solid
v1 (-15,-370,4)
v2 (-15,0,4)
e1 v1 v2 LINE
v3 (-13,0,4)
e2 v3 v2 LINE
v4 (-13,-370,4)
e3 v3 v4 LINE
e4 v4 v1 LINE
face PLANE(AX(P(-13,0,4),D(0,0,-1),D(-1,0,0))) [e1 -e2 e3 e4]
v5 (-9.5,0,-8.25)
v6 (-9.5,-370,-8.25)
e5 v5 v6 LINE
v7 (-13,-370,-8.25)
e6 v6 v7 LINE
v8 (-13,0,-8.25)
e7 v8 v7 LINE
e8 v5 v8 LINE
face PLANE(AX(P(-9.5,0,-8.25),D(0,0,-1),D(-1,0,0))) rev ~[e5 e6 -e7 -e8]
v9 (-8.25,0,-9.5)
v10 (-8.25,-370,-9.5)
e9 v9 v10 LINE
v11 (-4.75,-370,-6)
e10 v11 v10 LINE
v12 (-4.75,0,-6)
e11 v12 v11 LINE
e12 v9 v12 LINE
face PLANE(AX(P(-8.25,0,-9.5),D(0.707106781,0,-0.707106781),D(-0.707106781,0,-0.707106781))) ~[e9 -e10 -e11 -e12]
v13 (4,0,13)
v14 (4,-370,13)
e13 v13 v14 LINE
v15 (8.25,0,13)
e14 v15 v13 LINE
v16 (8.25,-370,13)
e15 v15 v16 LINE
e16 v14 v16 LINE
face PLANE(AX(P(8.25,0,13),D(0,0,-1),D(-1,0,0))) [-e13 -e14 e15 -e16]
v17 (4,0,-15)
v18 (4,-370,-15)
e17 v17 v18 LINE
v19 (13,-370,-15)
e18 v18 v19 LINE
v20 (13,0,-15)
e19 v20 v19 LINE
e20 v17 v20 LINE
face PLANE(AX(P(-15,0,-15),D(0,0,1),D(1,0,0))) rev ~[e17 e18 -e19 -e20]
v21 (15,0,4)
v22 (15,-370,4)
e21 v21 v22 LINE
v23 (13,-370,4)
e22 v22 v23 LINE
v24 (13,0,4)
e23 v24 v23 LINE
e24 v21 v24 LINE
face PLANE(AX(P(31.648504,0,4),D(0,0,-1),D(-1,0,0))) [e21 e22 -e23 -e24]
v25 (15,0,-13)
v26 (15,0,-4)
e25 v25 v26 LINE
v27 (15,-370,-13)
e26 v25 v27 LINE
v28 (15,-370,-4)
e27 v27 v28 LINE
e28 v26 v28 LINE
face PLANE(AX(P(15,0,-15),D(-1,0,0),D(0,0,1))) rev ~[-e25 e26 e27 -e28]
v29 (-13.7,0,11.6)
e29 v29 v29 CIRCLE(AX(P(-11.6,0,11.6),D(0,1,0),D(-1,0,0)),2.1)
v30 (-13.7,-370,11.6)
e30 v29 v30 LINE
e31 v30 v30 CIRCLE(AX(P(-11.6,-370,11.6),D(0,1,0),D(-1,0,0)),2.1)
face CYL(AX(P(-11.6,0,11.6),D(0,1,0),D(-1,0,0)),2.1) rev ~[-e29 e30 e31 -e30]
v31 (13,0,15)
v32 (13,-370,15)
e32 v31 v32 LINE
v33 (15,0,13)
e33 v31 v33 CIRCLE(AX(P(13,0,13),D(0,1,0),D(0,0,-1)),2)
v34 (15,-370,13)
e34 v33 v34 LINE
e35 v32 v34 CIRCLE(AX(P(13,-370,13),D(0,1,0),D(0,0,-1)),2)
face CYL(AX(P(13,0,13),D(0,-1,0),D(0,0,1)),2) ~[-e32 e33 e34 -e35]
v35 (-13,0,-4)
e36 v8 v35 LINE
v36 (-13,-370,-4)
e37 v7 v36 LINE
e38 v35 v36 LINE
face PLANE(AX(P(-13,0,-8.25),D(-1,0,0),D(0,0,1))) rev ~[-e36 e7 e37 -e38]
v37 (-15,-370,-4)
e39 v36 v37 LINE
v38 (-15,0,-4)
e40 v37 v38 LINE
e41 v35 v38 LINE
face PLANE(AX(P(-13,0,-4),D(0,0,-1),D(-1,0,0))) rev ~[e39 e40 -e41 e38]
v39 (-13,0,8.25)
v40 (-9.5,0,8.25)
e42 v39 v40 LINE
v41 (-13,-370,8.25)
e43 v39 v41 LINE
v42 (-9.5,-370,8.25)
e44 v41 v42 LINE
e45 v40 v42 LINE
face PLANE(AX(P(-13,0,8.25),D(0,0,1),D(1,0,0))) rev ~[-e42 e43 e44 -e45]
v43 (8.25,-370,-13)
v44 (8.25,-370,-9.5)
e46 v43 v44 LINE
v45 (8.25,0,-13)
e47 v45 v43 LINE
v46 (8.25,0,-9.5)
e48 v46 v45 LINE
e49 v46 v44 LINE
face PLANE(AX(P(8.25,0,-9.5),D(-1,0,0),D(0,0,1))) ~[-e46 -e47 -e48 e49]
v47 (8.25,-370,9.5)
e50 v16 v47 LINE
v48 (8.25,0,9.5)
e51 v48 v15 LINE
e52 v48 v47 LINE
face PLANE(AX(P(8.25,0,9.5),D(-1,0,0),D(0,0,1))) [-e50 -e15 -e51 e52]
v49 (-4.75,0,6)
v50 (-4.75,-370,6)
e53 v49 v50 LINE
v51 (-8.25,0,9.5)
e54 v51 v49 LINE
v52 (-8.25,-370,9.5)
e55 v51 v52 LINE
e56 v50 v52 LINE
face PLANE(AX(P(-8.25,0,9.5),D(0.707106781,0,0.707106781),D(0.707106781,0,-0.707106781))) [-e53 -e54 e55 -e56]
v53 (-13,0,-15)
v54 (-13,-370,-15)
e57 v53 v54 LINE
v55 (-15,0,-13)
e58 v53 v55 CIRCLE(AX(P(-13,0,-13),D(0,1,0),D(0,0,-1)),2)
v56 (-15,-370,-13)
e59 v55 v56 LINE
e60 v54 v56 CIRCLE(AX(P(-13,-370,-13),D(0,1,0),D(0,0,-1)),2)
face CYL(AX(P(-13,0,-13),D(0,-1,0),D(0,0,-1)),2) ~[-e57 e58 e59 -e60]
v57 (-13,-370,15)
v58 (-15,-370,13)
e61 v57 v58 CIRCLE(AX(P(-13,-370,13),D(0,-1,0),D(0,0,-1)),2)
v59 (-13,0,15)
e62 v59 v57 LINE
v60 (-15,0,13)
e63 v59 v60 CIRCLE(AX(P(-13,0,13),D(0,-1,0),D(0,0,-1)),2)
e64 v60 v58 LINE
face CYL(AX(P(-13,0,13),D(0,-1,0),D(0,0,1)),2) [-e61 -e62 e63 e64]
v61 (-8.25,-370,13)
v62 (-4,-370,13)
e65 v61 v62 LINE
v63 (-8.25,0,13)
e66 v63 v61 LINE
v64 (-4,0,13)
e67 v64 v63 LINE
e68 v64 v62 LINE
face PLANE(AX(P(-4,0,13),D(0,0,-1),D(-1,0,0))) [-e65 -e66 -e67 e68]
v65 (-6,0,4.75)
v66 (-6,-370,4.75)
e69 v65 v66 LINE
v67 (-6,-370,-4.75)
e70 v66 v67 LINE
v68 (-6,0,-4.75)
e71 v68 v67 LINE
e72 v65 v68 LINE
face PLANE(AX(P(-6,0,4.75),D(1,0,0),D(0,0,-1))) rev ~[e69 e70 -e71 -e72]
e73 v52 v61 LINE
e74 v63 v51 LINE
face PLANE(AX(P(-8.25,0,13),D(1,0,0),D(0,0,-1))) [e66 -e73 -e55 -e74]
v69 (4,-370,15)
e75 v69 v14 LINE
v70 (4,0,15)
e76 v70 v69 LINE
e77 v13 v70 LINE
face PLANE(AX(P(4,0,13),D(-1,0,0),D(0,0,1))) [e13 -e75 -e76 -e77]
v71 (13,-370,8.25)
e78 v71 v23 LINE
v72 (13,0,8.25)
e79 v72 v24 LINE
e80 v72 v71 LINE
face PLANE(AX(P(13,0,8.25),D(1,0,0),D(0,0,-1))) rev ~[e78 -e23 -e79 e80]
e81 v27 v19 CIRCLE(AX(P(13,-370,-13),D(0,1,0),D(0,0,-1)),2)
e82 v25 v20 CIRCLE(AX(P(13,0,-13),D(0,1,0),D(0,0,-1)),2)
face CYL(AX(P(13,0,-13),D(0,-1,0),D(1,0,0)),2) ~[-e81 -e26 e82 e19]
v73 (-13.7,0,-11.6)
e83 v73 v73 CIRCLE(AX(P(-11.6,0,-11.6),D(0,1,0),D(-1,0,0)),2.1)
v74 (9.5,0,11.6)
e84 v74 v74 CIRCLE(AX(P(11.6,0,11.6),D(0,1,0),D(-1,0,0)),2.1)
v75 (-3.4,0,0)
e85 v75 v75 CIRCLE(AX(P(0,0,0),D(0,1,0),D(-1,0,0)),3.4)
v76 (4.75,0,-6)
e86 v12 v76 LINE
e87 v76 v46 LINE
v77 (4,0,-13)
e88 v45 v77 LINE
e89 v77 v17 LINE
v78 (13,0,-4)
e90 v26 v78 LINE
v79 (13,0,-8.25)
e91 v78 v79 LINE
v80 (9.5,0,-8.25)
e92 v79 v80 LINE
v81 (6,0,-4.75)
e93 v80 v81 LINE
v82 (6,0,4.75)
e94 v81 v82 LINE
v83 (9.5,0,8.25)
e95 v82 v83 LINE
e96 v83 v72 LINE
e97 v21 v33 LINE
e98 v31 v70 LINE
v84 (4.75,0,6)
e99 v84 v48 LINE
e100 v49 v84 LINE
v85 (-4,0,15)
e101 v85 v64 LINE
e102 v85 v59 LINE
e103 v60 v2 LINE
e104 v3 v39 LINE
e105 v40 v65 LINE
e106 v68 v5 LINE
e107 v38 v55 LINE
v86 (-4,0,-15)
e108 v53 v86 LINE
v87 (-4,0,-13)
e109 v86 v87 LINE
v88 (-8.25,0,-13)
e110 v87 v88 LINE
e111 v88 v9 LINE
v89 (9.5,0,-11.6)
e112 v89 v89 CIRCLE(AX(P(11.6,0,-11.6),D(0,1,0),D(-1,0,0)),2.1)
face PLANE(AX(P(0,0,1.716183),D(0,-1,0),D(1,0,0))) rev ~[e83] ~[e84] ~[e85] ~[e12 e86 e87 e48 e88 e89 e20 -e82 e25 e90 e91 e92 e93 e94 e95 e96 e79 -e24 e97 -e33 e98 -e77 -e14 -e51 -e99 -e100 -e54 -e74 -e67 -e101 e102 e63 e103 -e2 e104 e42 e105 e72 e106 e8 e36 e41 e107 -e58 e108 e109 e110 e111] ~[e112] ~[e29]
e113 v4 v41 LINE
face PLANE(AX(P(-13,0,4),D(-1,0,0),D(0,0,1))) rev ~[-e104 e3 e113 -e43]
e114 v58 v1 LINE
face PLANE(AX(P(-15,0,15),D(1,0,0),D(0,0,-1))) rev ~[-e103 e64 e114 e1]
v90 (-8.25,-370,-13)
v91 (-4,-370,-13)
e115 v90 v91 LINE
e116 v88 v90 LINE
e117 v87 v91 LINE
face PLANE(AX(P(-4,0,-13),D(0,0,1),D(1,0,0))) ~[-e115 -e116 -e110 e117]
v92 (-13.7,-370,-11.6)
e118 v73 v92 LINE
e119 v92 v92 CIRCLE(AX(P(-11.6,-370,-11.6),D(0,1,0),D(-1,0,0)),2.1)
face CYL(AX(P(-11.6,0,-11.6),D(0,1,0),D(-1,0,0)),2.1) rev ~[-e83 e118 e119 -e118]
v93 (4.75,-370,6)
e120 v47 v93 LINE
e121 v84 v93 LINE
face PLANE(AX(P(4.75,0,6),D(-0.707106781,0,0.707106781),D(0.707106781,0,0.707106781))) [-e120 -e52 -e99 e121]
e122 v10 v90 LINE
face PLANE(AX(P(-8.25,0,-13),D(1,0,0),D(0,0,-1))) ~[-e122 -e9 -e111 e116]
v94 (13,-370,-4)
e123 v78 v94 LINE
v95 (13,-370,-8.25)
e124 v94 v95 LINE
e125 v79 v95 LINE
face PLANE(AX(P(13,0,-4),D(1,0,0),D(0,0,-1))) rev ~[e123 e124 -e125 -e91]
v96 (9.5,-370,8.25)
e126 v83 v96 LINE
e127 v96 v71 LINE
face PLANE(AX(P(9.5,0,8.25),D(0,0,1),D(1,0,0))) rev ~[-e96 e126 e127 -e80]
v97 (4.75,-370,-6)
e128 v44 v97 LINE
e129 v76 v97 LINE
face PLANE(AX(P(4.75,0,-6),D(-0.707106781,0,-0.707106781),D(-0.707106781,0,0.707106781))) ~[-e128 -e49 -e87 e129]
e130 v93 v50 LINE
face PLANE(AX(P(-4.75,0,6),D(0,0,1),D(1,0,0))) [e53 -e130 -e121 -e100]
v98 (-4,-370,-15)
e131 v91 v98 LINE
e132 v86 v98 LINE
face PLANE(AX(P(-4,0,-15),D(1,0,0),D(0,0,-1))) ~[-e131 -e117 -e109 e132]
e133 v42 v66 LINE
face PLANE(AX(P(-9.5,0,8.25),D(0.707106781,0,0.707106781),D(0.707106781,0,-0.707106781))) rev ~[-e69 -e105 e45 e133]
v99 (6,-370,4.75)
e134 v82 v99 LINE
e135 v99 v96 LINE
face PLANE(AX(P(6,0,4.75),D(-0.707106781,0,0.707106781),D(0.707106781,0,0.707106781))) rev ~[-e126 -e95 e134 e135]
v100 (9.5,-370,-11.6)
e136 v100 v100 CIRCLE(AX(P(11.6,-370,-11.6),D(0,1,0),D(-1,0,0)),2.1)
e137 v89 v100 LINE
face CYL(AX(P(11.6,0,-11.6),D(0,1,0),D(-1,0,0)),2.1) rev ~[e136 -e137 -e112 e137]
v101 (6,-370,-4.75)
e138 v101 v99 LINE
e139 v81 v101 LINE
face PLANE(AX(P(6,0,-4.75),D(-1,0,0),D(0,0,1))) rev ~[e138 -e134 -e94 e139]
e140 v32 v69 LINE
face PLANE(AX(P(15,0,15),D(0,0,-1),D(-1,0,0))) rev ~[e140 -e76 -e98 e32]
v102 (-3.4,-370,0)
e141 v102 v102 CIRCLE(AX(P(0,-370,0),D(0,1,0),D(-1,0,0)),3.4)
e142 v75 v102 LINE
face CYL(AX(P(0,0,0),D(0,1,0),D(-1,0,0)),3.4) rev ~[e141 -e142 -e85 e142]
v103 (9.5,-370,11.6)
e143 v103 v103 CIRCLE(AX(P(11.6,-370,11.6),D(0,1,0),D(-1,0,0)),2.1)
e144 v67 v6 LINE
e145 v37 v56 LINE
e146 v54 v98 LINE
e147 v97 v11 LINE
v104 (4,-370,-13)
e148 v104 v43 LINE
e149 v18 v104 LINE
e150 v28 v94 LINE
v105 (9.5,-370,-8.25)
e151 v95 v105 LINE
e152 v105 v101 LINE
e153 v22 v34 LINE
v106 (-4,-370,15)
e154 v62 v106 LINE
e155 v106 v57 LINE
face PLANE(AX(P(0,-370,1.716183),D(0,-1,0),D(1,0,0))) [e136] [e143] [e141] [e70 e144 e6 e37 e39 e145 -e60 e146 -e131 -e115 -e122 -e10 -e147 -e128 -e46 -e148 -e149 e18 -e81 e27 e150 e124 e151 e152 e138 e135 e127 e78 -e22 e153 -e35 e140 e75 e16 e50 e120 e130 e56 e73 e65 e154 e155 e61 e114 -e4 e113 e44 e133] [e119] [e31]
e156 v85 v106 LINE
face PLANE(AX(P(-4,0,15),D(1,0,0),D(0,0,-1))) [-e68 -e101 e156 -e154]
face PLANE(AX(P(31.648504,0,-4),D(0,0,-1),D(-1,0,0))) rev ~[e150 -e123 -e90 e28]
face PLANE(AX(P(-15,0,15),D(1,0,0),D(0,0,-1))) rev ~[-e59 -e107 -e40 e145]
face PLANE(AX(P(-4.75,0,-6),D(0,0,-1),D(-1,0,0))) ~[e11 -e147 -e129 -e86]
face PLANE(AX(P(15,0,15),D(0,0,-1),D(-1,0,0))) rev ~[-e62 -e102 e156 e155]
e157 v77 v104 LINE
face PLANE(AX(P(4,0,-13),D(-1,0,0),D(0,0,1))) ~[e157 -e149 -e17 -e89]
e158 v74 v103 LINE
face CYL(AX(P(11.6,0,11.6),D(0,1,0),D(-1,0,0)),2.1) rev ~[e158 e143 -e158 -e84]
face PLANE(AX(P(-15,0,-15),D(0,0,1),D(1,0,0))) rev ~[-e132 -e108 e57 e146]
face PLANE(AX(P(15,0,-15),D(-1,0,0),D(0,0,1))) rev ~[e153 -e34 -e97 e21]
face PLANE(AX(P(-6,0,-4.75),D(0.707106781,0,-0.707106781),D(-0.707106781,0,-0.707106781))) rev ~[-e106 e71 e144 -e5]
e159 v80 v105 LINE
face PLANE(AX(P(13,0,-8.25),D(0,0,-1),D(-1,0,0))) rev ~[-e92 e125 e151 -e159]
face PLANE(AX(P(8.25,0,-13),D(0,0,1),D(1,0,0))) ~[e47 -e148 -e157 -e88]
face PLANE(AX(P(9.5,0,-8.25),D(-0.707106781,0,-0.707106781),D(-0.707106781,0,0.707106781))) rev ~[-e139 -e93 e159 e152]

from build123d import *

# Parameters (mm, degrees)
F1_DEPTH = 370
F2_DEPTH = 400
F3_W     = 18.6485039899
F3_H     = 8
F3_W_2   = 19.9612321942
F3_R     = 3.4
F3_R_2   = 2.1
F4_DEPTH = 370
F5_R     = 2


# Not quite as in the source:
# - a pattern or mirror of a feature is missing from the dataset's text; its kind, count and spacing are read off the source's solid


with BuildPart() as f1:
    # F0 (on Front) → F1 (new body)
    with BuildSketch(Plane.XZ):
        Polygon((15, -15), (15, 15), (4, 15), (4, 13), (8.25, 13), (8.25, 9.5), (4.75, 6), (-4.75, 6), (-8.25, 9.5), (-8.25, 13), (-4, 13), (-4, 15), (-15, 15), (-15, -15), align=None)
        Polygon((4, 13), (4, 15), (-4, 15), (-4, 13), (-8.25, 13), (-8.25, 9.5), (-4.75, 6), (4.75, 6), (8.25, 9.5), (8.25, 13), align=None)
    extrude(amount=F1_DEPTH)

    # F0 (on Front) → F2 (cut)
    with BuildSketch(Plane.XZ):
        Polygon((4, 13), (4, 15), (-4, 15), (-4, 13), (-8.25, 13), (-8.25, 9.5), (-4.75, 6), (4.75, 6), (8.25, 9.5), (8.25, 13), align=None)
    f2 = extrude(amount=F2_DEPTH, mode=Mode.SUBTRACT)

    # F2_copies: F2 across plane
    add(f2.mirror(Plane(origin=(0, 0, 0), x_dir=(-1, 0, 0), z_dir=(0, 0, -1))), mode=Mode.SUBTRACT)

    # F3 (on face) → F4 (cut)
    with BuildSketch(Plane(origin=(0, 0, 0), x_dir=(-1, 0, 0), z_dir=(0, 1, 0))):
        Polygon((-6, 4.75), (-9.5, 8.25), (-13, 8.25), (-13, 4), (-13, -4), (-13, -8.25), (-9.5, -8.25), (-6, -4.75), align=None)
        with Locations((-22.3242519949, 0)):
            Rectangle(F3_W, F3_H)
        Polygon((13, 8.25), (9.5, 8.25), (6, 4.75), (6, -4.75), (9.5, -8.25), (13, -8.25), (13, -4), (13, 4), align=None)
        with Locations((22.9806160971, 0)):
            Rectangle(F3_W_2, F3_H)
        Circle(F3_R)
        with Locations((-11.6, 11.6)):
            Circle(F3_R_2)
        with Locations((-11.6, -11.6)):
            Circle(F3_R_2)
        with Locations((11.6, -11.6)):
            Circle(F3_R_2)
        with Locations((11.6, 11.6)):
            Circle(F3_R_2)
    extrude(amount=-F4_DEPTH, mode=Mode.SUBTRACT)

    # F5
    f5_edges = [f1.edges().sort_by_distance(p)[0] for p in [
        (-15, -185, 15),
        (-15, -185, -15),
        (15, -185, -15),
        (15, -185, 15),
    ]]
    fillet(f5_edges, radius=F5_R)


solid = f1.part
